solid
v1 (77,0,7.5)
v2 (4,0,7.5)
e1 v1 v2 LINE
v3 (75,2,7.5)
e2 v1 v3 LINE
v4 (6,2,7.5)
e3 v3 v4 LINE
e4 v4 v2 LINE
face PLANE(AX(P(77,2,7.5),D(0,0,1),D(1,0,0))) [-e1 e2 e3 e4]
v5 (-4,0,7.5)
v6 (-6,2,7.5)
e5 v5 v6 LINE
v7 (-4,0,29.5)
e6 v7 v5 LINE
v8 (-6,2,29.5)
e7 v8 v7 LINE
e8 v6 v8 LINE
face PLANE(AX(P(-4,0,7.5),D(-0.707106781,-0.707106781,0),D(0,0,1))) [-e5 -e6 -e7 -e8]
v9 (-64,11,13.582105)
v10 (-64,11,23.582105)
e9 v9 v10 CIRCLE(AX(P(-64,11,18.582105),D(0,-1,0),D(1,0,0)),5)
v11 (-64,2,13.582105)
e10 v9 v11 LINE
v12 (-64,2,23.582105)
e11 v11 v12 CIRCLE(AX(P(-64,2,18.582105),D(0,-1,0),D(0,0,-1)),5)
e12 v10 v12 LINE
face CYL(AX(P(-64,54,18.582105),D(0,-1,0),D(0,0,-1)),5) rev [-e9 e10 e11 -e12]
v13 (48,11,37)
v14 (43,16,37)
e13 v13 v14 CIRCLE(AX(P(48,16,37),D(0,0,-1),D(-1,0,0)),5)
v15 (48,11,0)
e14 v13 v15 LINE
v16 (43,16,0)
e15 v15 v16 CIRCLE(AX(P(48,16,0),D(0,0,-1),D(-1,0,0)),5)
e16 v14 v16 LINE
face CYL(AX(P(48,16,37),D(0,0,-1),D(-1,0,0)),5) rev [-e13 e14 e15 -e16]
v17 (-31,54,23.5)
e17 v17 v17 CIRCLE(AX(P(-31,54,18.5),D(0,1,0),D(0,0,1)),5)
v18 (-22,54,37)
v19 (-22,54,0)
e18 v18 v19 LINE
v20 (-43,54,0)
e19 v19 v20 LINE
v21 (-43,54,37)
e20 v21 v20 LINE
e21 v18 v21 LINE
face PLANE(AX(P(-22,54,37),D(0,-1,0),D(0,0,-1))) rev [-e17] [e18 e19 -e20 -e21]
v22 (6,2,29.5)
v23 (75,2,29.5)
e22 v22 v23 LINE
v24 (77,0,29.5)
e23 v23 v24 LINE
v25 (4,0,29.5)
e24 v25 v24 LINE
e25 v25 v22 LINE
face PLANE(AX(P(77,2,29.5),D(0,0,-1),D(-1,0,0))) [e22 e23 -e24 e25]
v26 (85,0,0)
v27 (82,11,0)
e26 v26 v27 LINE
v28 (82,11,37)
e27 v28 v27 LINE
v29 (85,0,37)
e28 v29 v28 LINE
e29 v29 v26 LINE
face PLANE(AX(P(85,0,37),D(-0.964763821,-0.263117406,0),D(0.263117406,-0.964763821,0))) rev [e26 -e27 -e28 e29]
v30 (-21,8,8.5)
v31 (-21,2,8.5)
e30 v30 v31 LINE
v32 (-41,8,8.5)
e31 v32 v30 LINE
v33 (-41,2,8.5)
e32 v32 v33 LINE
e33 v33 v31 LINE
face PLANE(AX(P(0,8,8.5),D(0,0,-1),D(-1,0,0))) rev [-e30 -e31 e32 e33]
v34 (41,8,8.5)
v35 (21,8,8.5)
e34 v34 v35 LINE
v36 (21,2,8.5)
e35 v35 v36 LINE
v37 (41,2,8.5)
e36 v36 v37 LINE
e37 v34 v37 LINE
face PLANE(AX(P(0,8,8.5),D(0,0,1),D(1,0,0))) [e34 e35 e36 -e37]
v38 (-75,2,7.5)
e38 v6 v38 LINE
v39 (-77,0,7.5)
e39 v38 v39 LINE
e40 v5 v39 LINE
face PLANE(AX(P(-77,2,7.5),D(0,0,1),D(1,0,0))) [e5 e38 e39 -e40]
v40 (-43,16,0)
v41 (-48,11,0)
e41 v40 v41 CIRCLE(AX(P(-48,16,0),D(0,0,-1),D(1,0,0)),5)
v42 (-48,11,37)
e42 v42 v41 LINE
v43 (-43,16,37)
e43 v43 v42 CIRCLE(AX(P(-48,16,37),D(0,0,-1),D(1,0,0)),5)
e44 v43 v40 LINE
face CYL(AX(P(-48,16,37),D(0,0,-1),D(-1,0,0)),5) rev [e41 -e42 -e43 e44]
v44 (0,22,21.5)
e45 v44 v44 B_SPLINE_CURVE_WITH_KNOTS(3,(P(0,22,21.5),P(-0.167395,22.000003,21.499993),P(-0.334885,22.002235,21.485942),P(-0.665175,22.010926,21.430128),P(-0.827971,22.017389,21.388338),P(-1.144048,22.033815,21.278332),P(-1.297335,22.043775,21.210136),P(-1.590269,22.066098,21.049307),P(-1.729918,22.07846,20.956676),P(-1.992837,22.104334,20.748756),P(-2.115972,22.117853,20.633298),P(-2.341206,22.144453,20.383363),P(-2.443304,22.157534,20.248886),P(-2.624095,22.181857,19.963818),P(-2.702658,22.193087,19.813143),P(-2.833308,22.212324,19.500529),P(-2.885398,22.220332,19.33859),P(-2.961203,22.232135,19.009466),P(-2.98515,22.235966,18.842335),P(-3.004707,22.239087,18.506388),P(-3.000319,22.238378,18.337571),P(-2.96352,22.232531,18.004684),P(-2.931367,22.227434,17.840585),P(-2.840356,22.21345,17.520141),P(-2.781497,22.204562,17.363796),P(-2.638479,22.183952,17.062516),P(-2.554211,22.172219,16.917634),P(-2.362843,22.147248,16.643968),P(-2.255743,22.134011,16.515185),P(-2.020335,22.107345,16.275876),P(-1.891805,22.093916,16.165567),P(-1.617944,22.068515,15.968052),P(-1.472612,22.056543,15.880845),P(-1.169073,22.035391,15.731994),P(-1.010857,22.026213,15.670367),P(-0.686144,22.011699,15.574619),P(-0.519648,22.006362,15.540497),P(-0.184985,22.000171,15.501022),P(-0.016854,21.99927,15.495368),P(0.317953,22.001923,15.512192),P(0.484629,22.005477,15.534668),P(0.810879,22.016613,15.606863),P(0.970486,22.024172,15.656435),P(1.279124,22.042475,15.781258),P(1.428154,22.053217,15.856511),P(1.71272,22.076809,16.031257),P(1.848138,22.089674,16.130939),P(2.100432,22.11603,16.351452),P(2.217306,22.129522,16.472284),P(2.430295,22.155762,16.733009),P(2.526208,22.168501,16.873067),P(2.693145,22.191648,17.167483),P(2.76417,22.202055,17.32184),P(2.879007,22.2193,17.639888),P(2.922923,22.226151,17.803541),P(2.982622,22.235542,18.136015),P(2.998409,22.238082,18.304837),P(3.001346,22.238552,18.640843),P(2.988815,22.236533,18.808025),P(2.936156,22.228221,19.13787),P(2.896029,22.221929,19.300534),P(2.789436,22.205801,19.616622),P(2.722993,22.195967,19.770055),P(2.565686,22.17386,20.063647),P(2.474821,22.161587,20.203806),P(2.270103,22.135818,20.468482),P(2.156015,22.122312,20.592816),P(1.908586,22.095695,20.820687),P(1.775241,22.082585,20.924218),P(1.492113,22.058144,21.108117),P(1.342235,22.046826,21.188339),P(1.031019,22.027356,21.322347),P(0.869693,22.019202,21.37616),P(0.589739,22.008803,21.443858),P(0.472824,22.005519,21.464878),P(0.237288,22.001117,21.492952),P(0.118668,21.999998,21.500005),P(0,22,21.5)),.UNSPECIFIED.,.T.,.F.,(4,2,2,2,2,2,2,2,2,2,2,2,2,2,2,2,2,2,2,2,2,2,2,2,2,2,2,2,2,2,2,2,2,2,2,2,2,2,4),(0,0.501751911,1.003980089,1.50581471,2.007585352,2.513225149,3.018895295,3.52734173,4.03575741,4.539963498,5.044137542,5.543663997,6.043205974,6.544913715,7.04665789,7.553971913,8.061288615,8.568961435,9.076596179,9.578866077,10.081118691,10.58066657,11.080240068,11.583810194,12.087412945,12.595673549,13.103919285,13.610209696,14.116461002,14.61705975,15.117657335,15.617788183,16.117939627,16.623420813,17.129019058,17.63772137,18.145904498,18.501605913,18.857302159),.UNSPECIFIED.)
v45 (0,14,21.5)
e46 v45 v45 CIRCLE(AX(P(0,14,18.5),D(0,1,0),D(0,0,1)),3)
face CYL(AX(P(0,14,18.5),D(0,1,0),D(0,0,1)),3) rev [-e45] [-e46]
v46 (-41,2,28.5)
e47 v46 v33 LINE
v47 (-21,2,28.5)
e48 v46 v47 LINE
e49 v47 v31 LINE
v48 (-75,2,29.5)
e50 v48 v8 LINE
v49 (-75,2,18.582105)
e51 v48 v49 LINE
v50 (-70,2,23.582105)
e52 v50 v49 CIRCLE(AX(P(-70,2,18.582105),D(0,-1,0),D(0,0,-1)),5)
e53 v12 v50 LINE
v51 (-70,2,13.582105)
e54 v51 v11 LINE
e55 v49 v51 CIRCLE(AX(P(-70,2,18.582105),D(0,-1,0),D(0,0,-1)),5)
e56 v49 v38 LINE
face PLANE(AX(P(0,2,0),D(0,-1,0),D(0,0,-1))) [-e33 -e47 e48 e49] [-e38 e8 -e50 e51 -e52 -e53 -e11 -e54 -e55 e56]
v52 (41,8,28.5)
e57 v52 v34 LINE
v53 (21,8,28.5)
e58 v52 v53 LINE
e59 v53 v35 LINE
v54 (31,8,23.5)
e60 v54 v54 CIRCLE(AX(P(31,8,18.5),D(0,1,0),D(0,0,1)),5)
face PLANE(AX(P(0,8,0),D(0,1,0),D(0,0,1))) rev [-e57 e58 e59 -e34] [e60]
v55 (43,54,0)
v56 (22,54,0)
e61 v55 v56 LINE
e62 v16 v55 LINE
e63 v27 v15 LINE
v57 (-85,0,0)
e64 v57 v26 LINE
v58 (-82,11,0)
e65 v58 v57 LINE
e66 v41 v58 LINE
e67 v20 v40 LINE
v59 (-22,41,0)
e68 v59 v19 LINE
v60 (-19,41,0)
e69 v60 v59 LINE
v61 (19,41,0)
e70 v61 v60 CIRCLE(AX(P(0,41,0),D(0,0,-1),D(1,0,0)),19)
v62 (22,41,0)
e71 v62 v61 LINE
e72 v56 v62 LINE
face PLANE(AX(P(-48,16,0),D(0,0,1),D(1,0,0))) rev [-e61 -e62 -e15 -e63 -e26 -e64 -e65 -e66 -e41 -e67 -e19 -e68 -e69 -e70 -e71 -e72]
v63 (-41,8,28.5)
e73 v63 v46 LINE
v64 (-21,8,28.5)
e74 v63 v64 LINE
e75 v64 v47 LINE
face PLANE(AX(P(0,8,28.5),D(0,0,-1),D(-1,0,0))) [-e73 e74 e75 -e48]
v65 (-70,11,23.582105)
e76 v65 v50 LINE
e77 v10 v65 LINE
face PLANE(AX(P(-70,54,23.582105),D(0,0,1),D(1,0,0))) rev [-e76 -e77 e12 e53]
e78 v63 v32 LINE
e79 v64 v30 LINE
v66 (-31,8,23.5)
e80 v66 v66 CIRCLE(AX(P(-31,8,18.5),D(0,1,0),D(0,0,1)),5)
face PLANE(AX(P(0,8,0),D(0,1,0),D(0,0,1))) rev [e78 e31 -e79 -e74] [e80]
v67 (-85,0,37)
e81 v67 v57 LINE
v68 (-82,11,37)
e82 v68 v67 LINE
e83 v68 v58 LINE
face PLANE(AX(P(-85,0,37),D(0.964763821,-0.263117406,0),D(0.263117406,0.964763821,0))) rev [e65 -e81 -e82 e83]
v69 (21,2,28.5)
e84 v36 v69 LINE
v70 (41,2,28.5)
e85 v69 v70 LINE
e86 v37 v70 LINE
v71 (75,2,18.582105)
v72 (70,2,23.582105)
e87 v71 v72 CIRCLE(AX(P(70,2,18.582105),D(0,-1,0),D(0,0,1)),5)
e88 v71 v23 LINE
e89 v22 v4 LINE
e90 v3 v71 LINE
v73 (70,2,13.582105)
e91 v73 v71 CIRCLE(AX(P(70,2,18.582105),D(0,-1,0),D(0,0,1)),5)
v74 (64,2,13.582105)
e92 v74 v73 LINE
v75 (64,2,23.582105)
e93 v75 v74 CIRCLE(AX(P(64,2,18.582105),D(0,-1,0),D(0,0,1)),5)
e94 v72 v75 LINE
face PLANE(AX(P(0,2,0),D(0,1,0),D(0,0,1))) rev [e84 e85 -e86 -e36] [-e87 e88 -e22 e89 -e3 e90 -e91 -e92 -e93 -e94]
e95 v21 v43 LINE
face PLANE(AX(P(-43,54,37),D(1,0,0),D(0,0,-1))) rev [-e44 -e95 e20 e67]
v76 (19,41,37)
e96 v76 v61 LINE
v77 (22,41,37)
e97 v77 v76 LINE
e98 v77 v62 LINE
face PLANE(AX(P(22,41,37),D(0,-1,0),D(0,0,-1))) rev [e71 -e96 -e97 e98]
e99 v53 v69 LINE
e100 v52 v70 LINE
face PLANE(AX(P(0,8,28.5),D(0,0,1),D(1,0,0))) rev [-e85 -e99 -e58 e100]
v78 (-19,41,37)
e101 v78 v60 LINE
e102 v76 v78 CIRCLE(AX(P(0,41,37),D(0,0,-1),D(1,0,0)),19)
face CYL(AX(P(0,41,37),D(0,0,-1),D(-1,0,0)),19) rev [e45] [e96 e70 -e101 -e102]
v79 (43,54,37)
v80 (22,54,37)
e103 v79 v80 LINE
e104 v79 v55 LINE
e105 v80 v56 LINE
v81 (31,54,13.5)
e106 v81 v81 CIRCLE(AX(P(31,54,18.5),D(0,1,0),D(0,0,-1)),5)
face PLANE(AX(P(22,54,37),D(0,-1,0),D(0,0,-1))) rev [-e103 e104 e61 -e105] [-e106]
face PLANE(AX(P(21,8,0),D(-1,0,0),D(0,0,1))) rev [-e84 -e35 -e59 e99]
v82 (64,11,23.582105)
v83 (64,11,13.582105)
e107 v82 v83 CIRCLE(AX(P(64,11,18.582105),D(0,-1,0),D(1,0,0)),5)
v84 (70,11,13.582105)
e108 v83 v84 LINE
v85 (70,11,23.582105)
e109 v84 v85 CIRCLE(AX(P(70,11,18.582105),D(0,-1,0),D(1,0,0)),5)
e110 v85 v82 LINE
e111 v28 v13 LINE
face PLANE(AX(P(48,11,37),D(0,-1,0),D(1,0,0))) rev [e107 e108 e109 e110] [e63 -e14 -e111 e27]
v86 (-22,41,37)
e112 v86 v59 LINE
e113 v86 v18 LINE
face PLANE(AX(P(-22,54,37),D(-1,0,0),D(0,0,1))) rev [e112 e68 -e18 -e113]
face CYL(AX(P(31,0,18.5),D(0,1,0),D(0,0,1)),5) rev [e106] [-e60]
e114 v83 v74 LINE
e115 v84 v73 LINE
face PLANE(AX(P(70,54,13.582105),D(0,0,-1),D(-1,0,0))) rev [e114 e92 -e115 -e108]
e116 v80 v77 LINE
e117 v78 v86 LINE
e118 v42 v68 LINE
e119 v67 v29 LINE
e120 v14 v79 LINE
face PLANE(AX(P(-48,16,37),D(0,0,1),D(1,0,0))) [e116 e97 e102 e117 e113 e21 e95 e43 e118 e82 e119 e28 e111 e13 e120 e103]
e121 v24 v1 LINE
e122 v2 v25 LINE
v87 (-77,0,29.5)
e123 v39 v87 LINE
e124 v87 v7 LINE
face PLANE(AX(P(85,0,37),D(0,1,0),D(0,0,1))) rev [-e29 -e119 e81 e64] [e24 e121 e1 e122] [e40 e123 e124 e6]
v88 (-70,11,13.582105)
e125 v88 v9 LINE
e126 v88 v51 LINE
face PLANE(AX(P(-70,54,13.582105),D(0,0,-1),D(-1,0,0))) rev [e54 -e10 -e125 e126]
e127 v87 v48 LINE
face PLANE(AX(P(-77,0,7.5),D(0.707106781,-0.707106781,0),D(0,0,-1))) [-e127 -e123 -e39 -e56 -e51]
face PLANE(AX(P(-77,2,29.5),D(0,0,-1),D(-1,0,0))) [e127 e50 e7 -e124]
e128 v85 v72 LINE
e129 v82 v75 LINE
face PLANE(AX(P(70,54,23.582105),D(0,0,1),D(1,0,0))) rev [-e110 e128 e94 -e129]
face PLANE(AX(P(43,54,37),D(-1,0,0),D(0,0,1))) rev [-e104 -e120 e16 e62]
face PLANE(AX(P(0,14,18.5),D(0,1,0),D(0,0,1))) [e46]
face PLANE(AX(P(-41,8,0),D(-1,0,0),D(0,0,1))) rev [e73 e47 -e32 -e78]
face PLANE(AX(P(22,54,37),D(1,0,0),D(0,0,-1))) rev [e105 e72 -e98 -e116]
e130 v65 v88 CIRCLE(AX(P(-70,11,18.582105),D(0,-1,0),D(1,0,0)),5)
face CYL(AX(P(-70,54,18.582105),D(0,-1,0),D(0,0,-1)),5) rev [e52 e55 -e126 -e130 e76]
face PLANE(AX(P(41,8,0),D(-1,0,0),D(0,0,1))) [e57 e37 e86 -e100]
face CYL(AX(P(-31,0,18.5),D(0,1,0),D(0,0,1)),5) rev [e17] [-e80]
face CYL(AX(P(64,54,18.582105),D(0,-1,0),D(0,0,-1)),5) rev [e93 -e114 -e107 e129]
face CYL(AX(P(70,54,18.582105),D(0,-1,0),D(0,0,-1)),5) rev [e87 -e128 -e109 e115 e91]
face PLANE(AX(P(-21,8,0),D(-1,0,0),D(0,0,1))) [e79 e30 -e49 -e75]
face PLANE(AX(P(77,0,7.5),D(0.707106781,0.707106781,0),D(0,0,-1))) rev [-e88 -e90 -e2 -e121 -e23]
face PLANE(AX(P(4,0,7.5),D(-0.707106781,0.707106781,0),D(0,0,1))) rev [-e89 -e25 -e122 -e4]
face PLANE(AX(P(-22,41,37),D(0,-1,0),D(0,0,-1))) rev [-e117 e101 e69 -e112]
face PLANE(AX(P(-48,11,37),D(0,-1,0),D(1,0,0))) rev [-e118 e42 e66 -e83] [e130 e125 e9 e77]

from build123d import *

# Parameters (mm, degrees)
BOSS_EXTRUDE1_DEPTH     = 37
SKETCH2_W               = 73
SKETCH2_H               = 22
CUT_EXTRUDE2_DEPTH      = 2
CHAMFER1_SIZE           = 2
CHAMFER2_SIZE           = 2
CHAMFER3_SIZE           = 2
CHAMFER4_SIZE           = 2
SKETCH3_W               = 20
SKETCH3_H               = 20
CUT_EXTRUDE4_DEPTH      = 8
CUT_EXTRUDE5_DEPTH      = 107.292050502
SKETCH6_R               = 5
CUT_EXTRUDE6_DEPTH      = 108.284668057
CUT_EXTRUDE7_DEPTH      = 21
CUT_EXTRUDE7_DEPTH_BACK = 2
SKETCH8_R               = 3


with BuildPart() as part:
    # Sketch1 → Boss-Extrude1 (new body)
    with BuildSketch(Plane.XY):
        with BuildLine():
            Line((85, 0), (-85, 0))
            Line((-85, 0), (-82, 11))
            Line((-82, 11), (-48, 11))
            ThreePointArc((-48, 11), (-44.464466094, 12.464466094), (-43, 16))
            Line((-43, 16), (-43, 54))
            Line((-43, 54), (-22, 54))
            Line((-22, 54), (-22, 41))
            Line((-22, 41), (-19, 41))
            ThreePointArc((-19, 41), (0, 22), (19, 41))
            Line((19, 41), (22, 41))
            Line((22, 41), (22, 54))
            Line((22, 54), (43, 54))
            Line((43, 54), (43, 16))
            ThreePointArc((43, 16), (44.464466094, 12.464466094), (48, 11))
            Line((48, 11), (82, 11))
            Line((82, 11), (85, 0))
        make_face()
    extrude(amount=BOSS_EXTRUDE1_DEPTH)

    # Sketch2 → Cut-Extrude2 (cut)
    with BuildSketch(Plane(origin=(0, 0, 0), x_dir=(1, 0, 0), z_dir=(0, 1, 0))):
        with Locations((-40.5, -18.5)):
            Rectangle(SKETCH2_W, SKETCH2_H)
        with Locations((40.5, -18.5)):
            Rectangle(SKETCH2_W, SKETCH2_H)
    extrude(amount=CUT_EXTRUDE2_DEPTH, mode=Mode.SUBTRACT)

    # Chamfer1
    chamfer1_edges = [part.edges().sort_by_distance(p)[0] for p in [
        (-77, 2, 18.5),
    ]]
    chamfer(chamfer1_edges, length=CHAMFER1_SIZE - 0.0001)  # a hair under: the kernel refuses the full size

    # Chamfer2
    chamfer2_edges = [part.edges().sort_by_distance(p)[0] for p in [
        (4, 2, 18.5),
    ]]
    chamfer(chamfer2_edges, length=CHAMFER2_SIZE - 0.0001)  # a hair under: the kernel refuses the full size

    # Chamfer3
    chamfer3_edges = [part.edges().sort_by_distance(p)[0] for p in [
        (-4, 2, 18.5),
    ]]
    chamfer(chamfer3_edges, length=CHAMFER3_SIZE - 0.0001)  # a hair under: the kernel refuses the full size

    # Chamfer4
    chamfer4_edges = [part.edges().sort_by_distance(p)[0] for p in [
        (77, 2, 18.5),
    ]]
    chamfer(chamfer4_edges, length=CHAMFER4_SIZE - 0.0001)  # a hair under: the kernel refuses the full size

    # Sketch3 → Cut-Extrude4 (cut)
    with BuildSketch(Plane(origin=(0, 0, 0), x_dir=(1, 0, 0), z_dir=(0, 1, 0))):
        with Locations((-31, -18.5)):
            Rectangle(SKETCH3_W, SKETCH3_H)
        with Locations((31, -18.5)):
            Rectangle(SKETCH3_W, SKETCH3_H)
    extrude(amount=CUT_EXTRUDE4_DEPTH, mode=Mode.SUBTRACT)

    # Sketch5 → Cut-Extrude5 (cut, through all)
    with BuildSketch(Plane.XZ.offset(-2)):
        with BuildLine():
            Line((70, 23.582105154), (64, 23.582105154))
            ThreePointArc((64, 23.582105154), (59, 18.582105154), (64, 13.582105154))
            Line((64, 13.582105154), (70, 13.582105154))
            ThreePointArc((70, 13.582105154), (75, 18.582105154), (70, 23.582105154))
        make_face()
        with BuildLine():
            Line((-70, 23.582105154), (-64, 23.582105154))
            ThreePointArc((-64, 23.582105154), (-59, 18.582105154), (-64, 13.582105154))
            Line((-64, 13.582105154), (-70, 13.582105154))
            ThreePointArc((-70, 13.582105154), (-75, 18.582105154), (-70, 23.582105154))
        make_face()
    extrude(amount=-CUT_EXTRUDE5_DEPTH, mode=Mode.SUBTRACT)

    # Sketch6 → Cut-Extrude6 (cut, through all)
    with BuildSketch(Plane(origin=(0, 54, 0), x_dir=(1, 0, 0), z_dir=(0, 1, 0))):
        with Locations(Location((-31, -18.5, 0), (0, 0, 270))):
            Circle(SKETCH6_R)
        with Locations(Location((31, -18.5, 0), (0, 0, 270))):
            Circle(SKETCH6_R)
    extrude(amount=-CUT_EXTRUDE6_DEPTH, mode=Mode.SUBTRACT)

    # Sketch8 → Cut-Extrude7 (cut, two sides: drawn at the far end of the back side and taken through both)
    with BuildSketch(Plane(origin=(0, 16, 0), x_dir=(1, 0, 0), z_dir=(0, 1, 0)).offset(-CUT_EXTRUDE7_DEPTH_BACK)):
        with Locations(Location((0, -18.5, 0), (0, 0, 270))):
            Circle(SKETCH8_R)
    extrude(amount=CUT_EXTRUDE7_DEPTH + CUT_EXTRUDE7_DEPTH_BACK, mode=Mode.SUBTRACT)


solid = part.part
